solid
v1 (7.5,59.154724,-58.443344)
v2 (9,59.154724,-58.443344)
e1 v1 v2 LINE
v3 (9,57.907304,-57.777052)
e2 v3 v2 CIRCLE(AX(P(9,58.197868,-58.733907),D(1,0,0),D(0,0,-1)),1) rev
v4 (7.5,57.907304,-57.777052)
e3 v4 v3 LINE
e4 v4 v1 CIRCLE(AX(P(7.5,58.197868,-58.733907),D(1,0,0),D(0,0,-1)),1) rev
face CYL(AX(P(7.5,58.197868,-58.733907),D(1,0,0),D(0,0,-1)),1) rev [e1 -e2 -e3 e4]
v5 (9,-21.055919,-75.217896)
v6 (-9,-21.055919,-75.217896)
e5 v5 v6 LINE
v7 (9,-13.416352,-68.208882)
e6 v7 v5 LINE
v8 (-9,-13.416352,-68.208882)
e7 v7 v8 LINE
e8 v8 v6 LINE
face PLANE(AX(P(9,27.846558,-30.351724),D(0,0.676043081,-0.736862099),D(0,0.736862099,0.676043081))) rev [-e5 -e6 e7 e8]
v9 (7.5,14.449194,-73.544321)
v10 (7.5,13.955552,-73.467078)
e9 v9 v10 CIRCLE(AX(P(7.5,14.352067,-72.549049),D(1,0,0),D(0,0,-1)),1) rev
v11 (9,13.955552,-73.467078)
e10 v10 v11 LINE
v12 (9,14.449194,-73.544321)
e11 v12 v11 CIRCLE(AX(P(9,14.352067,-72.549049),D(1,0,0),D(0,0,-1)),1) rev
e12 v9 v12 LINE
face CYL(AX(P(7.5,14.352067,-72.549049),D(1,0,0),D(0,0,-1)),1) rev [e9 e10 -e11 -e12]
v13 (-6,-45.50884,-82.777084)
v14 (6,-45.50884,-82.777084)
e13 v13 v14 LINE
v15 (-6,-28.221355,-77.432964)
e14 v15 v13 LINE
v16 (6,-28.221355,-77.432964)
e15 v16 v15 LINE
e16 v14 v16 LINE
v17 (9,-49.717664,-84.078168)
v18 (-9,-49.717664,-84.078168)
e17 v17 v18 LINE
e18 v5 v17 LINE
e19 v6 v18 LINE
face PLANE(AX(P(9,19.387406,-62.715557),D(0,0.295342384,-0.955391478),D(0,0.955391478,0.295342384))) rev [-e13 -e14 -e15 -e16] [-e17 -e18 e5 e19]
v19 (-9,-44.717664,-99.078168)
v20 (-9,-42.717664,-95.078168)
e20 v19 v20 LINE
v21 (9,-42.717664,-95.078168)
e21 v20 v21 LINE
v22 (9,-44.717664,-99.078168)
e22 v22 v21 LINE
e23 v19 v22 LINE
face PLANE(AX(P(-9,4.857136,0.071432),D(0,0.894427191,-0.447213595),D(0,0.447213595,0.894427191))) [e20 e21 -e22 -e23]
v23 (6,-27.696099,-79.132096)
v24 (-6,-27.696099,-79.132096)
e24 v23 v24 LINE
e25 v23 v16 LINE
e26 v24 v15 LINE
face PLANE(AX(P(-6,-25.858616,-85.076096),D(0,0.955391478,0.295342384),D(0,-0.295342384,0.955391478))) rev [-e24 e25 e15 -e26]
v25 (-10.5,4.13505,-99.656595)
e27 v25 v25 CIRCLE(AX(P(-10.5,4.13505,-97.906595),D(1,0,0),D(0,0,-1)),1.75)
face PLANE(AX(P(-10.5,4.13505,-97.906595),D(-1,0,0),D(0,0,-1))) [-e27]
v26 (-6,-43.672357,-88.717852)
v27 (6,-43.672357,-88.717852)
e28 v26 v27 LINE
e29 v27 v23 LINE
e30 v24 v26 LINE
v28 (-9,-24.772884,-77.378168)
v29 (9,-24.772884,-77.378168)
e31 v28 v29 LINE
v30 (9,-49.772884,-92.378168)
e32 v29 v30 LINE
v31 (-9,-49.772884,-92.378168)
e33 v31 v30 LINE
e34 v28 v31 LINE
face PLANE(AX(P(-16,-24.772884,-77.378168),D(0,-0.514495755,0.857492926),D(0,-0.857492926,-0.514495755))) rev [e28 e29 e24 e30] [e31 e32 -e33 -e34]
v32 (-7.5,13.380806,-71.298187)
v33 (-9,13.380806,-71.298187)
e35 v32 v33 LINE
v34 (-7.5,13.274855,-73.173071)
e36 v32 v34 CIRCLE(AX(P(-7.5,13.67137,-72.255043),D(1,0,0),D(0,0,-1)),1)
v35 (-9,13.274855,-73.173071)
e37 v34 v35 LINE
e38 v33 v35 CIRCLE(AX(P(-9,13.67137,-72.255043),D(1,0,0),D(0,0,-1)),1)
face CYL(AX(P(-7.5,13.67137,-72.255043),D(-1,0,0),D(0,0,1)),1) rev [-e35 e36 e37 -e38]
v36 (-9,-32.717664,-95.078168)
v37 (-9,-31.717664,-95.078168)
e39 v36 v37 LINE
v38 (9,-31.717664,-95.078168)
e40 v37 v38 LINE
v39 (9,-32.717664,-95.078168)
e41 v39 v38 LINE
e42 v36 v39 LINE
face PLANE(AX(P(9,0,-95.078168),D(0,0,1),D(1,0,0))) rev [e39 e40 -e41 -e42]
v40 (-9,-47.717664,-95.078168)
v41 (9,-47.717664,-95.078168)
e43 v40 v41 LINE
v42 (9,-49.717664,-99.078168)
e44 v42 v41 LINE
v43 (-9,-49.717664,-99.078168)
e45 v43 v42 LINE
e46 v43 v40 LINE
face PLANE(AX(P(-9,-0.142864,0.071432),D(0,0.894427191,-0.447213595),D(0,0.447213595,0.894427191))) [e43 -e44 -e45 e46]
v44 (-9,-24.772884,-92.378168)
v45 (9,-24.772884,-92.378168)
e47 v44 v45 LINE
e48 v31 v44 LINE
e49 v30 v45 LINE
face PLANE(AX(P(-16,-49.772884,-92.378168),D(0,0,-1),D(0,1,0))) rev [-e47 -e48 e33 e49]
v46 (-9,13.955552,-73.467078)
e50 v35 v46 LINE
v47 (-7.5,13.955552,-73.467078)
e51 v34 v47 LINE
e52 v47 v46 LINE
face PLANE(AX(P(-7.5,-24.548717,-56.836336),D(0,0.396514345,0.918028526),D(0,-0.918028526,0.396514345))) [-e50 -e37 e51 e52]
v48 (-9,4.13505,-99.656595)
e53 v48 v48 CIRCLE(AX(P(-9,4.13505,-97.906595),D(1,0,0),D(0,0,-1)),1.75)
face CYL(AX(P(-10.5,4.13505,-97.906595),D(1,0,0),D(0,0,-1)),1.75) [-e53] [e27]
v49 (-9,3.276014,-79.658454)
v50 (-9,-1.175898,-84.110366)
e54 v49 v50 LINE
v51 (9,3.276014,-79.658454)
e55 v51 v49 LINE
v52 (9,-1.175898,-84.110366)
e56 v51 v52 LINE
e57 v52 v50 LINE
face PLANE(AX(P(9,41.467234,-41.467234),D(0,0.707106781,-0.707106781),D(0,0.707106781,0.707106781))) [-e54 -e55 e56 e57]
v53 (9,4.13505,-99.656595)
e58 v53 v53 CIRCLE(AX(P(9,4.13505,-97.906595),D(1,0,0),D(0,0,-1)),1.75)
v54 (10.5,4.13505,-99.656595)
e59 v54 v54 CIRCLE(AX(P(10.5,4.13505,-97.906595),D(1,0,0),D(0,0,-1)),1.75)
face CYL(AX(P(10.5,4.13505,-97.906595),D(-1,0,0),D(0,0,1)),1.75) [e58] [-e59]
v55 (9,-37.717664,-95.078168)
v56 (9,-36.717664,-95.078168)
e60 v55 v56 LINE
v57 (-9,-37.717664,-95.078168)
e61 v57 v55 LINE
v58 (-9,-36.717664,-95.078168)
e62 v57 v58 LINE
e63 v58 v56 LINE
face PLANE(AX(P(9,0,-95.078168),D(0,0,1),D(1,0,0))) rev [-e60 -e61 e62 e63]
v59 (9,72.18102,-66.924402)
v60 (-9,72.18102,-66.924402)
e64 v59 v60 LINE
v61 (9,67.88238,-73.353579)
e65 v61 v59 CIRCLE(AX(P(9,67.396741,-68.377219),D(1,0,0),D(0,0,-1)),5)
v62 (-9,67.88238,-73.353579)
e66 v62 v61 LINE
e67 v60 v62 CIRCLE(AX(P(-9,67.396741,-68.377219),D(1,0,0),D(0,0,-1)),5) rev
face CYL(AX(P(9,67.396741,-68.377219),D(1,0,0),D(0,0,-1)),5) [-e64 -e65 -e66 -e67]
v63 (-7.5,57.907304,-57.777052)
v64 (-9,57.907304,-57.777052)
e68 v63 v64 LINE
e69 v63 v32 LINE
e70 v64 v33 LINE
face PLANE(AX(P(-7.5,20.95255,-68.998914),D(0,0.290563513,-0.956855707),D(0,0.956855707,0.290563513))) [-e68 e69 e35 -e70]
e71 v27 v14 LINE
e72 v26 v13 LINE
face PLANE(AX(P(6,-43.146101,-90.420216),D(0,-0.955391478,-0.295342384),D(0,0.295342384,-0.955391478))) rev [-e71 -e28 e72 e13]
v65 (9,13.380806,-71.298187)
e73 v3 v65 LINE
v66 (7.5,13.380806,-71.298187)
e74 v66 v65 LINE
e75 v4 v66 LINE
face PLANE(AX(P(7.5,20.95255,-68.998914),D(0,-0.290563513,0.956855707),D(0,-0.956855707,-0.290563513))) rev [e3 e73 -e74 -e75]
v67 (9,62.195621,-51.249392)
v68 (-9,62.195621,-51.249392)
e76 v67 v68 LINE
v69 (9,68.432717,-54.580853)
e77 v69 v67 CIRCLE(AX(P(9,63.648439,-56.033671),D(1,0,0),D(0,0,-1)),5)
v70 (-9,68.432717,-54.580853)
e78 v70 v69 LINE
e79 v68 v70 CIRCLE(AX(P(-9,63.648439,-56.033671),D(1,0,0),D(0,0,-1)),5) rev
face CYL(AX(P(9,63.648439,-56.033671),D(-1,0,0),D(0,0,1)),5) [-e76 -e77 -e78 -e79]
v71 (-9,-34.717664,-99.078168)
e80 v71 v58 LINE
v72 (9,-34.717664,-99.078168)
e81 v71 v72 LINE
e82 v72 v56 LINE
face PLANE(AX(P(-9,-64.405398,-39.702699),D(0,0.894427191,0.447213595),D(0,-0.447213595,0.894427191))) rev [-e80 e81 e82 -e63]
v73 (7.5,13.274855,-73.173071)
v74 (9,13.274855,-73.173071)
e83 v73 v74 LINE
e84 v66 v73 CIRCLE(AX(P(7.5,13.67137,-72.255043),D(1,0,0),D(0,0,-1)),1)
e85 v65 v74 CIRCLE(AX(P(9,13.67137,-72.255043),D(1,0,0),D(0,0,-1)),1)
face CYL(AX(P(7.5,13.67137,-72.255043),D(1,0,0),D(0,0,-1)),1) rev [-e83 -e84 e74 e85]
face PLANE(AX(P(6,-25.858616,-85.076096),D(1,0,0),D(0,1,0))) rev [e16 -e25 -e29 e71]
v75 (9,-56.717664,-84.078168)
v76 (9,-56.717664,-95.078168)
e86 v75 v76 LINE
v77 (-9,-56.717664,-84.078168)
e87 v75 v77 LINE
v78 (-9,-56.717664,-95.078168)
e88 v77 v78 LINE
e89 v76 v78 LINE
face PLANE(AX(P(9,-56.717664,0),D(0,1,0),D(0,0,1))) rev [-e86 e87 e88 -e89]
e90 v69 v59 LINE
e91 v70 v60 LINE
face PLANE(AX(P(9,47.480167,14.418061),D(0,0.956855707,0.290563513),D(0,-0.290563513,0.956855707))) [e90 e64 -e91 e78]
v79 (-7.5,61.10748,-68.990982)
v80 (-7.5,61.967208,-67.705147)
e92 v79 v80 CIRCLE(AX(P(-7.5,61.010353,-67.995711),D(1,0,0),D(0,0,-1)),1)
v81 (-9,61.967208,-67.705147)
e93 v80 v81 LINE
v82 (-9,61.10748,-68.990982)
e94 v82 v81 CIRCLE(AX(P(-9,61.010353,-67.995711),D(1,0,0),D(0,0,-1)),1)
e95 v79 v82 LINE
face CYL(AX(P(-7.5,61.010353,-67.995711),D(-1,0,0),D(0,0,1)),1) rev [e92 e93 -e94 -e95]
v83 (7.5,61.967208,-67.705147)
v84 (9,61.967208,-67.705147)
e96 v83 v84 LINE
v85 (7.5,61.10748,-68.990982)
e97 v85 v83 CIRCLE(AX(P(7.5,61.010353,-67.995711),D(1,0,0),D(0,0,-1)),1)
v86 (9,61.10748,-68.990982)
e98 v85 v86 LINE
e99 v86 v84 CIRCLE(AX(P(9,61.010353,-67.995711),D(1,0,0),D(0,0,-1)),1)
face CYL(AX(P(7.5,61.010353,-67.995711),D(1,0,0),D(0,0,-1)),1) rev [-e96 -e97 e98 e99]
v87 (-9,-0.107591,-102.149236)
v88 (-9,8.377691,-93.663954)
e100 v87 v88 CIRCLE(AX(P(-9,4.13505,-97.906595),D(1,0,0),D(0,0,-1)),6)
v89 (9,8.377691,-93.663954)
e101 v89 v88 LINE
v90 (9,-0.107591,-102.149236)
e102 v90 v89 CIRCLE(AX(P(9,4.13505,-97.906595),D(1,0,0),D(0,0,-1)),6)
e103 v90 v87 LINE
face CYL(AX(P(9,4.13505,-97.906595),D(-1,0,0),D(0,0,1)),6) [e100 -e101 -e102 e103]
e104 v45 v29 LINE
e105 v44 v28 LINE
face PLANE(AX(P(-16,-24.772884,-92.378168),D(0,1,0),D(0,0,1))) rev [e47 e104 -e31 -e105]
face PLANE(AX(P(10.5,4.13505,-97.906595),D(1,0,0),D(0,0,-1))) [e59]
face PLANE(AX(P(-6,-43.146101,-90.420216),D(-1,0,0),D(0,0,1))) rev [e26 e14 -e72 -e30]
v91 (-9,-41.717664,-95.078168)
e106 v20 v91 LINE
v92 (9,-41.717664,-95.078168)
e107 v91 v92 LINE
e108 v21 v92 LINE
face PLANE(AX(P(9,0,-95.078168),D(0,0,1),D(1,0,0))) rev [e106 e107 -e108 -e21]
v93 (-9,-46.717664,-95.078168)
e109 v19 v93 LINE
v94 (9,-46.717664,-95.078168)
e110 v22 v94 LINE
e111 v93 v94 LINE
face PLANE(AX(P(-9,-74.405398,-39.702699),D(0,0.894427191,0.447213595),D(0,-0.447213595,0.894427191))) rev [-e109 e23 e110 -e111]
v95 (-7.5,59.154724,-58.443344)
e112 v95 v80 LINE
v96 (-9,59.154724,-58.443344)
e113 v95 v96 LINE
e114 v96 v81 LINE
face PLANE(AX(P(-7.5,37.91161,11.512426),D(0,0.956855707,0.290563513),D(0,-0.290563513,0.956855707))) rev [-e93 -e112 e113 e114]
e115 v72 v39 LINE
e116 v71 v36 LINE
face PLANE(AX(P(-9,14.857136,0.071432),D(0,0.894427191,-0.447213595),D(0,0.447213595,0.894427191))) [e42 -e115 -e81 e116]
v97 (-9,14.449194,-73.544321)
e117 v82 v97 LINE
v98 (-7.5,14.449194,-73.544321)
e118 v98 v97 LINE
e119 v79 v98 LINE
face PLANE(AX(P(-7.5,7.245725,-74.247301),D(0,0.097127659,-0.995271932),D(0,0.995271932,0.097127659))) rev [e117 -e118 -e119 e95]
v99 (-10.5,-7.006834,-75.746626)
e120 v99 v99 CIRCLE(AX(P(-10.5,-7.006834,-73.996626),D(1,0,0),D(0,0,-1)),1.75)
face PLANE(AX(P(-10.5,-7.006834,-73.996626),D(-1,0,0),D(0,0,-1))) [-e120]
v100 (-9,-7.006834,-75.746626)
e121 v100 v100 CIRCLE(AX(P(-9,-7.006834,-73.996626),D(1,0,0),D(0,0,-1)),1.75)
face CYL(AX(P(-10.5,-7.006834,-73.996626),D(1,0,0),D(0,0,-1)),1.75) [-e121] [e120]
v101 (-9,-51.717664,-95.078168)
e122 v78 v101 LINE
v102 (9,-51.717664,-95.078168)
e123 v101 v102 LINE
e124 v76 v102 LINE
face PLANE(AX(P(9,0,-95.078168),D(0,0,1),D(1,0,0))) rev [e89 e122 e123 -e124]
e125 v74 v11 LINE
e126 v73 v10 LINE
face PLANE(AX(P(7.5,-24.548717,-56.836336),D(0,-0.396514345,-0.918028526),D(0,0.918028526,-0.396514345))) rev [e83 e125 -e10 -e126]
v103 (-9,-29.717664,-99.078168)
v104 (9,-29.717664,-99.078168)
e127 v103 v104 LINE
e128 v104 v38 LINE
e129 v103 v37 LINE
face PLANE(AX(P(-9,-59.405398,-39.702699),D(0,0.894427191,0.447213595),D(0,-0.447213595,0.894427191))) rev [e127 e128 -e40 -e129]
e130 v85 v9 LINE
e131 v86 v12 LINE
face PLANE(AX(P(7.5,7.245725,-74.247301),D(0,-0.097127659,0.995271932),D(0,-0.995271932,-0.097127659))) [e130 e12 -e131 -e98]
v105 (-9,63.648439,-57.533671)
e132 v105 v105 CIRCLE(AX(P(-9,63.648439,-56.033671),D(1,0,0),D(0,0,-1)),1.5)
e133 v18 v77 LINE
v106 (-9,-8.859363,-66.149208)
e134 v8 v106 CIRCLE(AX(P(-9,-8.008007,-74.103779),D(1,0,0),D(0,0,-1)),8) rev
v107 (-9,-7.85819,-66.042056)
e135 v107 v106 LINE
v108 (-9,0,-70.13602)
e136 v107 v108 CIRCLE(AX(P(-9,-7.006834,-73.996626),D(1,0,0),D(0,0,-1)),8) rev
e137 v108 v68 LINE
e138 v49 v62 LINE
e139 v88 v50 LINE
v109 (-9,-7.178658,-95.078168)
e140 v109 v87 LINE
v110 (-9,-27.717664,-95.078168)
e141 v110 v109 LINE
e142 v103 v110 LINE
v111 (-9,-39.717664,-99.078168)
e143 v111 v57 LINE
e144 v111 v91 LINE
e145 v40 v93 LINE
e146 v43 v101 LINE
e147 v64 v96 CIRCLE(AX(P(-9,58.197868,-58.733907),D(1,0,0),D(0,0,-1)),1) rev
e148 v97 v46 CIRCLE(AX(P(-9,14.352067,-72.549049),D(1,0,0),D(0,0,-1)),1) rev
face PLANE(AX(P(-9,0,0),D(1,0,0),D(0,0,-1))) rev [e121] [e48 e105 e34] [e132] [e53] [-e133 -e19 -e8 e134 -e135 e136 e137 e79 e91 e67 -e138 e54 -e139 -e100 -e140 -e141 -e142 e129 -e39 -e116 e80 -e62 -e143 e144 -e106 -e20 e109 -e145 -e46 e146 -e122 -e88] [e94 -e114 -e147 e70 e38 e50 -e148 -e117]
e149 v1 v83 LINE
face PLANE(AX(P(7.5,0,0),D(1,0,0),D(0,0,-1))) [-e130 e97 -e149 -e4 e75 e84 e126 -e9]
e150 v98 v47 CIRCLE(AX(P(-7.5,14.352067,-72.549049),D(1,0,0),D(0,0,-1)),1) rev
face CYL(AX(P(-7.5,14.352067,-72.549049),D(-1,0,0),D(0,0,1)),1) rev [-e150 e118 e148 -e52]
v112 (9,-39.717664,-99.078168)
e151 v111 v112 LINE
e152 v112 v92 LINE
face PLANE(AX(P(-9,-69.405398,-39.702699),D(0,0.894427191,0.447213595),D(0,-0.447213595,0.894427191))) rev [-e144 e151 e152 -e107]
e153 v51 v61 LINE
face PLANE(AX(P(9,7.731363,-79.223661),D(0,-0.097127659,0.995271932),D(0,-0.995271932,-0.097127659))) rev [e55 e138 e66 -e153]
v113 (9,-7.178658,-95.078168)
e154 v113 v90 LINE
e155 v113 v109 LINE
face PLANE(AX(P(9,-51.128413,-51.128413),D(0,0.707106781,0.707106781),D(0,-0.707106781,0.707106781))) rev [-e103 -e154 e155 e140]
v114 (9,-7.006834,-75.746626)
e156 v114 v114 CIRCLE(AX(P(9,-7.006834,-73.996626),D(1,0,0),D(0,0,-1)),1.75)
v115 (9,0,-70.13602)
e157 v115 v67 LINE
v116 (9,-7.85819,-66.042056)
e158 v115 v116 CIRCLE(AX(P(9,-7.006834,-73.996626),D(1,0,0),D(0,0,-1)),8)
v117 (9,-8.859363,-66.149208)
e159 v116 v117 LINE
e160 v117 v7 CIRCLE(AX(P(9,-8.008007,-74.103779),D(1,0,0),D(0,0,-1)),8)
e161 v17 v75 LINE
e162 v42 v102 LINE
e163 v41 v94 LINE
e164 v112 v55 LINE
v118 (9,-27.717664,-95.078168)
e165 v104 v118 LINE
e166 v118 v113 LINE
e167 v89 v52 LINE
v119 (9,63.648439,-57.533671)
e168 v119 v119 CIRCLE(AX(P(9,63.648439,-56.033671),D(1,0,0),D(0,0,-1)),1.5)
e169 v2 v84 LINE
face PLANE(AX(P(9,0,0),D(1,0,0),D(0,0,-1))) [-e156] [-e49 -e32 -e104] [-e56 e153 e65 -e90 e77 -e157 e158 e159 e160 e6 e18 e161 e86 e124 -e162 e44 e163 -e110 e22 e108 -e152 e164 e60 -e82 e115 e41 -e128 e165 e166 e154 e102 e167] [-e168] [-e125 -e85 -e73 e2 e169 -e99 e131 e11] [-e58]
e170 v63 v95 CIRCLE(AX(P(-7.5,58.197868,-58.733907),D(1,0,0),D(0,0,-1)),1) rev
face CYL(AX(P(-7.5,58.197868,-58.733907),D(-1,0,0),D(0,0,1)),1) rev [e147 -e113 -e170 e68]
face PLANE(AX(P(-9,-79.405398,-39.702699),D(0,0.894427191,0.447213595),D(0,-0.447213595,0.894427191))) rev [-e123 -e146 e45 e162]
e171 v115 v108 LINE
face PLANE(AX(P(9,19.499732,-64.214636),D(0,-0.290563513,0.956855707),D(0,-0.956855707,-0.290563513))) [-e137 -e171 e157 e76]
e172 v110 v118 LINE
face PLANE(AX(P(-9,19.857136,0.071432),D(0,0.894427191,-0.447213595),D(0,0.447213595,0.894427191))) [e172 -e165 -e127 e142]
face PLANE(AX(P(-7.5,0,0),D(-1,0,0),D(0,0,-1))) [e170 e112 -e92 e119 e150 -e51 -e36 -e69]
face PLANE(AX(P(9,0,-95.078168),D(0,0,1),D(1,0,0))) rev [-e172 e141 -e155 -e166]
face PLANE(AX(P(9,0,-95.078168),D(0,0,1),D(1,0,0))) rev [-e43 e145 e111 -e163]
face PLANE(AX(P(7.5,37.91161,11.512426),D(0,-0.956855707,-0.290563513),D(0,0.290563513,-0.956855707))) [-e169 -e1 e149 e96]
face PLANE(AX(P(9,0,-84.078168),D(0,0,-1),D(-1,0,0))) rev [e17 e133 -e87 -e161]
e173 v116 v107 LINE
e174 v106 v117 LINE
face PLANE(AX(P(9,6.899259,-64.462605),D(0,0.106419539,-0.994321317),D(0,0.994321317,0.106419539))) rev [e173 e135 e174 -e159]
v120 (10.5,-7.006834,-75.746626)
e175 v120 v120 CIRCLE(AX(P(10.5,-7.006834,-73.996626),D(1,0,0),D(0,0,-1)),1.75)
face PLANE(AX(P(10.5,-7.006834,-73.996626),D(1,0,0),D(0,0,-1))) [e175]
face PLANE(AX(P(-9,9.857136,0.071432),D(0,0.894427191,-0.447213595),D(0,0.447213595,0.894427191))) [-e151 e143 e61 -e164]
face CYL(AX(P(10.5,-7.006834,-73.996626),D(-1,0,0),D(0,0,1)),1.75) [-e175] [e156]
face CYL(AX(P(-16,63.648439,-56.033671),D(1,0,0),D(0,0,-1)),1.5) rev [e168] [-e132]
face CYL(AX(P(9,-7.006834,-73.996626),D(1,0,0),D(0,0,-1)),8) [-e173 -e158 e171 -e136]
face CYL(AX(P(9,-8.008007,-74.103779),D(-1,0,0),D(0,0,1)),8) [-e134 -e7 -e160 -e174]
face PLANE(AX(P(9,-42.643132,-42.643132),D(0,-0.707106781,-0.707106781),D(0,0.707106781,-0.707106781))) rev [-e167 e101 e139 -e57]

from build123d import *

# Parameters (mm, degrees)
BOSS_EXTRUDE1_DEPTH = 9
CUT_EXTRUDE1_DEPTH  = 25
BOSS_EXTRUDE2_DEPTH = 18
LPATTERN1_COUNT     = 5
LPATTERN1_PITCH     = 5
FILLET2_R           = 8
FILLET3_R           = 5
SKETCH6_R           = 1.5
CUT_EXTRUDE2_DEPTH  = 25
SKETCH7_W           = 12
SKETCH7_H           = 18.094661032
CUT_EXTRUDE3_DEPTH  = 8
SKETCH8_R           = 1.75
BOSS_EXTRUDE3_DEPTH = 1.5
SKETCH12_R          = 1.75
BOSS_EXTRUDE4_DEPTH = 1.5
CUT_EXTRUDE6_DEPTH  = 1.5


with BuildPart() as part:
    # Sketch3 → Boss-Extrude1 (new, symmetric)
    with BuildSketch(Plane(origin=(0, 0, 0), x_dir=(0, 0, -1), z_dir=(1, 0, 0))):
        with BuildLine():
            Line((49.79657451, 66.979899518), (70.136020437, 0))
            Line((70.136020437, 0), (65.359063047, -1.476711918))
            Line((65.359063047, -1.476711918), (66.429336182, -11.476711918))
            Line((66.429336182, -11.476711918), (75.217896234, -21.055919203))
            Line((75.217896234, -21.055919203), (84.07816774, -49.717663547))
            Line((84.07816774, -49.717663547), (84.07816774, -56.717663547))
            Line((84.07816774, -56.717663547), (95.07816774, -56.717663547))
            Line((95.07816774, -56.717663547), (95.07816774, -7.178658436))
            Line((95.07816774, -7.178658436), (102.149235552, -0.107590624))
            ThreePointArc((102.149235552, -0.107590624), (102.149235552, 8.37769075), (93.663954178, 8.37769075))
            Line((93.663954178, 8.37769075), (84.110365879, -1.175897549))
            Line((84.110365879, -1.175897549), (79.658453904, 3.276014426))
            Line((79.658453904, 3.276014426), (72.761111488, 73.953423835))
            Line((72.761111488, 73.953423835), (49.79657451, 66.979899518))
        make_face()
    extrude(amount=BOSS_EXTRUDE1_DEPTH, both=True)

    # Sketch4 → Cut-Extrude1 (cut)
    with BuildSketch(Plane(origin=(9, 0, 0), x_dir=(0, 0, -1), z_dir=(1, 0, 0))):
        Polygon((92.37816774, -49.772884049), (92.37816774, -24.772884049), (77.37816774, -24.772884049), align=None)
    extrude(amount=-CUT_EXTRUDE1_DEPTH, mode=Mode.SUBTRACT)

    # Sketch5 → Boss-Extrude2 (add)
    with BuildSketch(Plane(origin=(9, 0, 0), x_dir=(0, 0, -1), z_dir=(1, 0, 0))):
        Polygon((95.07816774, -47.717663547), (95.07816774, -49.717663547), (99.07816774, -49.717663547), align=None)
        Polygon((99.07816774, -49.717663547), (95.07816774, -49.717663547), (95.07816774, -51.717663547), align=None)
    boss_extrude2 = extrude(amount=-BOSS_EXTRUDE2_DEPTH)

    # LPattern1: Boss-Extrude2 ×5
    with Locations(*[(0, i * LPATTERN1_PITCH, 0) for i in range(1, LPATTERN1_COUNT)]):
        add(boss_extrude2)

    # Fillet2
    # the kernel refuses this fillet: 8 mm, written as the material it takes off along each edge
    with BuildSketch(Plane(origin=(-15.580741663, -11.476711918, -66.429336182), x_dir=(0, 0.9943213171006763, 0.10641953936743088), z_dir=(1, 0, 0))) as fillet2_piece_1:
        with BuildLine():
            CenterArc((FILLET2_R * 0.329037083141, -FILLET2_R), FILLET2_R, 90, 36.426245441)
            Line((-FILLET2_R * 0.264750438373, -FILLET2_R * 0.195378114085), (-FILLET2_R * 0.276626188803, -FILLET2_R * 0.179285676366))
            Line((-FILLET2_R * 0.276626188803, -FILLET2_R * 0.179285676366), (-FILLET2_R * 0.00658074166282, FILLET2_R * 0.02))
            Line((-FILLET2_R * 0.00658074166282, FILLET2_R * 0.02), (FILLET2_R * 0.329037083141, FILLET2_R * 0.02))
            Line((FILLET2_R * 0.329037083141, FILLET2_R * 0.02), (FILLET2_R * 0.329037083141, 0))
        make_face()
    extrude(amount=31.161483326, mode=Mode.SUBTRACT)
    with BuildSketch(Plane(origin=(-25.044809619, -1.476711918, -65.359063047), x_dir=(0, 0.2953423835382918, -0.9553914781313054), z_dir=(1, 0, 0))) as fillet2_piece_2:
        with BuildLine():
            CenterArc((6.618974651, -7.834470057), FILLET2_R, 101.675691656, 67.255197487)
            Line((-1.232195855, -6.298526803), (-1.389219265, -6.267807938))
            Line((-1.389219265, -6.267807938), (-0.15702341, 0.030718865))
            Line((-0.15702341, 0.030718865), (0, 0.16))
            ThreePointArc((0, 0.16), (2.5, 0.16), (4.967620507, 0.156689401))
            Line((4.967620507, 0.156689401), (5, 0))
        make_face()
    extrude(amount=50.089619238, mode=Mode.SUBTRACT)

    # Fillet3
    fillet3_edges = [part.edges().sort_by_distance(p)[0] for p in [
        (0, 66.979899518, -49.79657451),
        (0, 73.953423835, -72.761111488),
    ]]
    fillet(fillet3_edges, radius=FILLET3_R)

    # Sketch6 → Cut-Extrude2 (cut)
    with BuildSketch(Plane(origin=(9, 0, 0), x_dir=(0, 0, -1), z_dir=(1, 0, 0))):
        with Locations((56.033670614, 63.648438547)):
            Circle(SKETCH6_R)
    extrude(amount=-CUT_EXTRUDE2_DEPTH, mode=Mode.SUBTRACT)

    # Sketch7 → Cut-Extrude3 (cut)
    with BuildSketch(Plane(origin=(0, 19.387405719, -62.715557398), x_dir=(1, 0, 0), z_dir=(0, -0.29534238353829306, 0.955391478131305))):
        with Locations((0, -58.879009045)):
            Rectangle(SKETCH7_W, SKETCH7_H)
    extrude(amount=-CUT_EXTRUDE3_DEPTH, mode=Mode.SUBTRACT)

    # Sketch8 → Boss-Extrude3 (add)
    with BuildSketch(Plane(origin=(9, 0, 0), x_dir=(0, 0, -1), z_dir=(1, 0, 0))):
        with Locations((97.906594865, 4.135050063)):
            Circle(SKETCH8_R)
    boss_extrude3 = extrude(amount=BOSS_EXTRUDE3_DEPTH)

    # Sketch12 → Boss-Extrude4 (add)
    with BuildSketch(Plane(origin=(9, 0, 0), x_dir=(0, 0, -1), z_dir=(1, 0, 0))):
        with Locations((73.996626083, -7.006834096)):
            Circle(SKETCH12_R)
    boss_extrude4 = extrude(amount=BOSS_EXTRUDE4_DEPTH)

    # Sketch13 → Cut-Extrude6 (cut)
    with BuildSketch(Plane(origin=(9, 0, 0), x_dir=(0, 0, -1), z_dir=(1, 0, 0))):
        with BuildLine():
            Line((73.173071484, 13.27485534), (73.467077668, 13.955552183))
            ThreePointArc((73.467077668, 13.955552183), (73.53702701, 14.197471144), (73.544321074, 14.449194188))
            Line((73.544321074, 14.449194188), (68.990982491, 61.107480203))
            ThreePointArc((68.990982491, 61.107480203), (68.551531185, 61.841654795), (67.705147046, 61.967208252))
            Line((67.705147046, 61.967208252), (58.443343887, 59.154723523))
            ThreePointArc((58.443343887, 59.154723523), (57.851848811, 58.669007544), (57.777051693, 57.907304302))
            Line((57.777051693, 57.907304302), (71.298187251, 13.380806172))
            ThreePointArc((71.298187251, 13.380806172), (72.198622375, 12.672962595), (73.173071484, 13.27485534))
        make_face()
    cut_extrude6 = extrude(amount=-CUT_EXTRUDE6_DEPTH, mode=Mode.SUBTRACT)

    # Mirror1: Boss-Extrude3, Boss-Extrude4, Cut-Extrude6 across plane
    add(boss_extrude3.mirror(Plane(origin=(0, 0, 0), x_dir=(0, 0, 1), z_dir=(1, 0, 0))))
    add(boss_extrude4.mirror(Plane(origin=(0, 0, 0), x_dir=(0, 0, 1), z_dir=(1, 0, 0))))
    add(cut_extrude6.mirror(Plane(origin=(0, 0, 0), x_dir=(0, 0, 1), z_dir=(1, 0, 0))), mode=Mode.SUBTRACT)


solid = part.part
